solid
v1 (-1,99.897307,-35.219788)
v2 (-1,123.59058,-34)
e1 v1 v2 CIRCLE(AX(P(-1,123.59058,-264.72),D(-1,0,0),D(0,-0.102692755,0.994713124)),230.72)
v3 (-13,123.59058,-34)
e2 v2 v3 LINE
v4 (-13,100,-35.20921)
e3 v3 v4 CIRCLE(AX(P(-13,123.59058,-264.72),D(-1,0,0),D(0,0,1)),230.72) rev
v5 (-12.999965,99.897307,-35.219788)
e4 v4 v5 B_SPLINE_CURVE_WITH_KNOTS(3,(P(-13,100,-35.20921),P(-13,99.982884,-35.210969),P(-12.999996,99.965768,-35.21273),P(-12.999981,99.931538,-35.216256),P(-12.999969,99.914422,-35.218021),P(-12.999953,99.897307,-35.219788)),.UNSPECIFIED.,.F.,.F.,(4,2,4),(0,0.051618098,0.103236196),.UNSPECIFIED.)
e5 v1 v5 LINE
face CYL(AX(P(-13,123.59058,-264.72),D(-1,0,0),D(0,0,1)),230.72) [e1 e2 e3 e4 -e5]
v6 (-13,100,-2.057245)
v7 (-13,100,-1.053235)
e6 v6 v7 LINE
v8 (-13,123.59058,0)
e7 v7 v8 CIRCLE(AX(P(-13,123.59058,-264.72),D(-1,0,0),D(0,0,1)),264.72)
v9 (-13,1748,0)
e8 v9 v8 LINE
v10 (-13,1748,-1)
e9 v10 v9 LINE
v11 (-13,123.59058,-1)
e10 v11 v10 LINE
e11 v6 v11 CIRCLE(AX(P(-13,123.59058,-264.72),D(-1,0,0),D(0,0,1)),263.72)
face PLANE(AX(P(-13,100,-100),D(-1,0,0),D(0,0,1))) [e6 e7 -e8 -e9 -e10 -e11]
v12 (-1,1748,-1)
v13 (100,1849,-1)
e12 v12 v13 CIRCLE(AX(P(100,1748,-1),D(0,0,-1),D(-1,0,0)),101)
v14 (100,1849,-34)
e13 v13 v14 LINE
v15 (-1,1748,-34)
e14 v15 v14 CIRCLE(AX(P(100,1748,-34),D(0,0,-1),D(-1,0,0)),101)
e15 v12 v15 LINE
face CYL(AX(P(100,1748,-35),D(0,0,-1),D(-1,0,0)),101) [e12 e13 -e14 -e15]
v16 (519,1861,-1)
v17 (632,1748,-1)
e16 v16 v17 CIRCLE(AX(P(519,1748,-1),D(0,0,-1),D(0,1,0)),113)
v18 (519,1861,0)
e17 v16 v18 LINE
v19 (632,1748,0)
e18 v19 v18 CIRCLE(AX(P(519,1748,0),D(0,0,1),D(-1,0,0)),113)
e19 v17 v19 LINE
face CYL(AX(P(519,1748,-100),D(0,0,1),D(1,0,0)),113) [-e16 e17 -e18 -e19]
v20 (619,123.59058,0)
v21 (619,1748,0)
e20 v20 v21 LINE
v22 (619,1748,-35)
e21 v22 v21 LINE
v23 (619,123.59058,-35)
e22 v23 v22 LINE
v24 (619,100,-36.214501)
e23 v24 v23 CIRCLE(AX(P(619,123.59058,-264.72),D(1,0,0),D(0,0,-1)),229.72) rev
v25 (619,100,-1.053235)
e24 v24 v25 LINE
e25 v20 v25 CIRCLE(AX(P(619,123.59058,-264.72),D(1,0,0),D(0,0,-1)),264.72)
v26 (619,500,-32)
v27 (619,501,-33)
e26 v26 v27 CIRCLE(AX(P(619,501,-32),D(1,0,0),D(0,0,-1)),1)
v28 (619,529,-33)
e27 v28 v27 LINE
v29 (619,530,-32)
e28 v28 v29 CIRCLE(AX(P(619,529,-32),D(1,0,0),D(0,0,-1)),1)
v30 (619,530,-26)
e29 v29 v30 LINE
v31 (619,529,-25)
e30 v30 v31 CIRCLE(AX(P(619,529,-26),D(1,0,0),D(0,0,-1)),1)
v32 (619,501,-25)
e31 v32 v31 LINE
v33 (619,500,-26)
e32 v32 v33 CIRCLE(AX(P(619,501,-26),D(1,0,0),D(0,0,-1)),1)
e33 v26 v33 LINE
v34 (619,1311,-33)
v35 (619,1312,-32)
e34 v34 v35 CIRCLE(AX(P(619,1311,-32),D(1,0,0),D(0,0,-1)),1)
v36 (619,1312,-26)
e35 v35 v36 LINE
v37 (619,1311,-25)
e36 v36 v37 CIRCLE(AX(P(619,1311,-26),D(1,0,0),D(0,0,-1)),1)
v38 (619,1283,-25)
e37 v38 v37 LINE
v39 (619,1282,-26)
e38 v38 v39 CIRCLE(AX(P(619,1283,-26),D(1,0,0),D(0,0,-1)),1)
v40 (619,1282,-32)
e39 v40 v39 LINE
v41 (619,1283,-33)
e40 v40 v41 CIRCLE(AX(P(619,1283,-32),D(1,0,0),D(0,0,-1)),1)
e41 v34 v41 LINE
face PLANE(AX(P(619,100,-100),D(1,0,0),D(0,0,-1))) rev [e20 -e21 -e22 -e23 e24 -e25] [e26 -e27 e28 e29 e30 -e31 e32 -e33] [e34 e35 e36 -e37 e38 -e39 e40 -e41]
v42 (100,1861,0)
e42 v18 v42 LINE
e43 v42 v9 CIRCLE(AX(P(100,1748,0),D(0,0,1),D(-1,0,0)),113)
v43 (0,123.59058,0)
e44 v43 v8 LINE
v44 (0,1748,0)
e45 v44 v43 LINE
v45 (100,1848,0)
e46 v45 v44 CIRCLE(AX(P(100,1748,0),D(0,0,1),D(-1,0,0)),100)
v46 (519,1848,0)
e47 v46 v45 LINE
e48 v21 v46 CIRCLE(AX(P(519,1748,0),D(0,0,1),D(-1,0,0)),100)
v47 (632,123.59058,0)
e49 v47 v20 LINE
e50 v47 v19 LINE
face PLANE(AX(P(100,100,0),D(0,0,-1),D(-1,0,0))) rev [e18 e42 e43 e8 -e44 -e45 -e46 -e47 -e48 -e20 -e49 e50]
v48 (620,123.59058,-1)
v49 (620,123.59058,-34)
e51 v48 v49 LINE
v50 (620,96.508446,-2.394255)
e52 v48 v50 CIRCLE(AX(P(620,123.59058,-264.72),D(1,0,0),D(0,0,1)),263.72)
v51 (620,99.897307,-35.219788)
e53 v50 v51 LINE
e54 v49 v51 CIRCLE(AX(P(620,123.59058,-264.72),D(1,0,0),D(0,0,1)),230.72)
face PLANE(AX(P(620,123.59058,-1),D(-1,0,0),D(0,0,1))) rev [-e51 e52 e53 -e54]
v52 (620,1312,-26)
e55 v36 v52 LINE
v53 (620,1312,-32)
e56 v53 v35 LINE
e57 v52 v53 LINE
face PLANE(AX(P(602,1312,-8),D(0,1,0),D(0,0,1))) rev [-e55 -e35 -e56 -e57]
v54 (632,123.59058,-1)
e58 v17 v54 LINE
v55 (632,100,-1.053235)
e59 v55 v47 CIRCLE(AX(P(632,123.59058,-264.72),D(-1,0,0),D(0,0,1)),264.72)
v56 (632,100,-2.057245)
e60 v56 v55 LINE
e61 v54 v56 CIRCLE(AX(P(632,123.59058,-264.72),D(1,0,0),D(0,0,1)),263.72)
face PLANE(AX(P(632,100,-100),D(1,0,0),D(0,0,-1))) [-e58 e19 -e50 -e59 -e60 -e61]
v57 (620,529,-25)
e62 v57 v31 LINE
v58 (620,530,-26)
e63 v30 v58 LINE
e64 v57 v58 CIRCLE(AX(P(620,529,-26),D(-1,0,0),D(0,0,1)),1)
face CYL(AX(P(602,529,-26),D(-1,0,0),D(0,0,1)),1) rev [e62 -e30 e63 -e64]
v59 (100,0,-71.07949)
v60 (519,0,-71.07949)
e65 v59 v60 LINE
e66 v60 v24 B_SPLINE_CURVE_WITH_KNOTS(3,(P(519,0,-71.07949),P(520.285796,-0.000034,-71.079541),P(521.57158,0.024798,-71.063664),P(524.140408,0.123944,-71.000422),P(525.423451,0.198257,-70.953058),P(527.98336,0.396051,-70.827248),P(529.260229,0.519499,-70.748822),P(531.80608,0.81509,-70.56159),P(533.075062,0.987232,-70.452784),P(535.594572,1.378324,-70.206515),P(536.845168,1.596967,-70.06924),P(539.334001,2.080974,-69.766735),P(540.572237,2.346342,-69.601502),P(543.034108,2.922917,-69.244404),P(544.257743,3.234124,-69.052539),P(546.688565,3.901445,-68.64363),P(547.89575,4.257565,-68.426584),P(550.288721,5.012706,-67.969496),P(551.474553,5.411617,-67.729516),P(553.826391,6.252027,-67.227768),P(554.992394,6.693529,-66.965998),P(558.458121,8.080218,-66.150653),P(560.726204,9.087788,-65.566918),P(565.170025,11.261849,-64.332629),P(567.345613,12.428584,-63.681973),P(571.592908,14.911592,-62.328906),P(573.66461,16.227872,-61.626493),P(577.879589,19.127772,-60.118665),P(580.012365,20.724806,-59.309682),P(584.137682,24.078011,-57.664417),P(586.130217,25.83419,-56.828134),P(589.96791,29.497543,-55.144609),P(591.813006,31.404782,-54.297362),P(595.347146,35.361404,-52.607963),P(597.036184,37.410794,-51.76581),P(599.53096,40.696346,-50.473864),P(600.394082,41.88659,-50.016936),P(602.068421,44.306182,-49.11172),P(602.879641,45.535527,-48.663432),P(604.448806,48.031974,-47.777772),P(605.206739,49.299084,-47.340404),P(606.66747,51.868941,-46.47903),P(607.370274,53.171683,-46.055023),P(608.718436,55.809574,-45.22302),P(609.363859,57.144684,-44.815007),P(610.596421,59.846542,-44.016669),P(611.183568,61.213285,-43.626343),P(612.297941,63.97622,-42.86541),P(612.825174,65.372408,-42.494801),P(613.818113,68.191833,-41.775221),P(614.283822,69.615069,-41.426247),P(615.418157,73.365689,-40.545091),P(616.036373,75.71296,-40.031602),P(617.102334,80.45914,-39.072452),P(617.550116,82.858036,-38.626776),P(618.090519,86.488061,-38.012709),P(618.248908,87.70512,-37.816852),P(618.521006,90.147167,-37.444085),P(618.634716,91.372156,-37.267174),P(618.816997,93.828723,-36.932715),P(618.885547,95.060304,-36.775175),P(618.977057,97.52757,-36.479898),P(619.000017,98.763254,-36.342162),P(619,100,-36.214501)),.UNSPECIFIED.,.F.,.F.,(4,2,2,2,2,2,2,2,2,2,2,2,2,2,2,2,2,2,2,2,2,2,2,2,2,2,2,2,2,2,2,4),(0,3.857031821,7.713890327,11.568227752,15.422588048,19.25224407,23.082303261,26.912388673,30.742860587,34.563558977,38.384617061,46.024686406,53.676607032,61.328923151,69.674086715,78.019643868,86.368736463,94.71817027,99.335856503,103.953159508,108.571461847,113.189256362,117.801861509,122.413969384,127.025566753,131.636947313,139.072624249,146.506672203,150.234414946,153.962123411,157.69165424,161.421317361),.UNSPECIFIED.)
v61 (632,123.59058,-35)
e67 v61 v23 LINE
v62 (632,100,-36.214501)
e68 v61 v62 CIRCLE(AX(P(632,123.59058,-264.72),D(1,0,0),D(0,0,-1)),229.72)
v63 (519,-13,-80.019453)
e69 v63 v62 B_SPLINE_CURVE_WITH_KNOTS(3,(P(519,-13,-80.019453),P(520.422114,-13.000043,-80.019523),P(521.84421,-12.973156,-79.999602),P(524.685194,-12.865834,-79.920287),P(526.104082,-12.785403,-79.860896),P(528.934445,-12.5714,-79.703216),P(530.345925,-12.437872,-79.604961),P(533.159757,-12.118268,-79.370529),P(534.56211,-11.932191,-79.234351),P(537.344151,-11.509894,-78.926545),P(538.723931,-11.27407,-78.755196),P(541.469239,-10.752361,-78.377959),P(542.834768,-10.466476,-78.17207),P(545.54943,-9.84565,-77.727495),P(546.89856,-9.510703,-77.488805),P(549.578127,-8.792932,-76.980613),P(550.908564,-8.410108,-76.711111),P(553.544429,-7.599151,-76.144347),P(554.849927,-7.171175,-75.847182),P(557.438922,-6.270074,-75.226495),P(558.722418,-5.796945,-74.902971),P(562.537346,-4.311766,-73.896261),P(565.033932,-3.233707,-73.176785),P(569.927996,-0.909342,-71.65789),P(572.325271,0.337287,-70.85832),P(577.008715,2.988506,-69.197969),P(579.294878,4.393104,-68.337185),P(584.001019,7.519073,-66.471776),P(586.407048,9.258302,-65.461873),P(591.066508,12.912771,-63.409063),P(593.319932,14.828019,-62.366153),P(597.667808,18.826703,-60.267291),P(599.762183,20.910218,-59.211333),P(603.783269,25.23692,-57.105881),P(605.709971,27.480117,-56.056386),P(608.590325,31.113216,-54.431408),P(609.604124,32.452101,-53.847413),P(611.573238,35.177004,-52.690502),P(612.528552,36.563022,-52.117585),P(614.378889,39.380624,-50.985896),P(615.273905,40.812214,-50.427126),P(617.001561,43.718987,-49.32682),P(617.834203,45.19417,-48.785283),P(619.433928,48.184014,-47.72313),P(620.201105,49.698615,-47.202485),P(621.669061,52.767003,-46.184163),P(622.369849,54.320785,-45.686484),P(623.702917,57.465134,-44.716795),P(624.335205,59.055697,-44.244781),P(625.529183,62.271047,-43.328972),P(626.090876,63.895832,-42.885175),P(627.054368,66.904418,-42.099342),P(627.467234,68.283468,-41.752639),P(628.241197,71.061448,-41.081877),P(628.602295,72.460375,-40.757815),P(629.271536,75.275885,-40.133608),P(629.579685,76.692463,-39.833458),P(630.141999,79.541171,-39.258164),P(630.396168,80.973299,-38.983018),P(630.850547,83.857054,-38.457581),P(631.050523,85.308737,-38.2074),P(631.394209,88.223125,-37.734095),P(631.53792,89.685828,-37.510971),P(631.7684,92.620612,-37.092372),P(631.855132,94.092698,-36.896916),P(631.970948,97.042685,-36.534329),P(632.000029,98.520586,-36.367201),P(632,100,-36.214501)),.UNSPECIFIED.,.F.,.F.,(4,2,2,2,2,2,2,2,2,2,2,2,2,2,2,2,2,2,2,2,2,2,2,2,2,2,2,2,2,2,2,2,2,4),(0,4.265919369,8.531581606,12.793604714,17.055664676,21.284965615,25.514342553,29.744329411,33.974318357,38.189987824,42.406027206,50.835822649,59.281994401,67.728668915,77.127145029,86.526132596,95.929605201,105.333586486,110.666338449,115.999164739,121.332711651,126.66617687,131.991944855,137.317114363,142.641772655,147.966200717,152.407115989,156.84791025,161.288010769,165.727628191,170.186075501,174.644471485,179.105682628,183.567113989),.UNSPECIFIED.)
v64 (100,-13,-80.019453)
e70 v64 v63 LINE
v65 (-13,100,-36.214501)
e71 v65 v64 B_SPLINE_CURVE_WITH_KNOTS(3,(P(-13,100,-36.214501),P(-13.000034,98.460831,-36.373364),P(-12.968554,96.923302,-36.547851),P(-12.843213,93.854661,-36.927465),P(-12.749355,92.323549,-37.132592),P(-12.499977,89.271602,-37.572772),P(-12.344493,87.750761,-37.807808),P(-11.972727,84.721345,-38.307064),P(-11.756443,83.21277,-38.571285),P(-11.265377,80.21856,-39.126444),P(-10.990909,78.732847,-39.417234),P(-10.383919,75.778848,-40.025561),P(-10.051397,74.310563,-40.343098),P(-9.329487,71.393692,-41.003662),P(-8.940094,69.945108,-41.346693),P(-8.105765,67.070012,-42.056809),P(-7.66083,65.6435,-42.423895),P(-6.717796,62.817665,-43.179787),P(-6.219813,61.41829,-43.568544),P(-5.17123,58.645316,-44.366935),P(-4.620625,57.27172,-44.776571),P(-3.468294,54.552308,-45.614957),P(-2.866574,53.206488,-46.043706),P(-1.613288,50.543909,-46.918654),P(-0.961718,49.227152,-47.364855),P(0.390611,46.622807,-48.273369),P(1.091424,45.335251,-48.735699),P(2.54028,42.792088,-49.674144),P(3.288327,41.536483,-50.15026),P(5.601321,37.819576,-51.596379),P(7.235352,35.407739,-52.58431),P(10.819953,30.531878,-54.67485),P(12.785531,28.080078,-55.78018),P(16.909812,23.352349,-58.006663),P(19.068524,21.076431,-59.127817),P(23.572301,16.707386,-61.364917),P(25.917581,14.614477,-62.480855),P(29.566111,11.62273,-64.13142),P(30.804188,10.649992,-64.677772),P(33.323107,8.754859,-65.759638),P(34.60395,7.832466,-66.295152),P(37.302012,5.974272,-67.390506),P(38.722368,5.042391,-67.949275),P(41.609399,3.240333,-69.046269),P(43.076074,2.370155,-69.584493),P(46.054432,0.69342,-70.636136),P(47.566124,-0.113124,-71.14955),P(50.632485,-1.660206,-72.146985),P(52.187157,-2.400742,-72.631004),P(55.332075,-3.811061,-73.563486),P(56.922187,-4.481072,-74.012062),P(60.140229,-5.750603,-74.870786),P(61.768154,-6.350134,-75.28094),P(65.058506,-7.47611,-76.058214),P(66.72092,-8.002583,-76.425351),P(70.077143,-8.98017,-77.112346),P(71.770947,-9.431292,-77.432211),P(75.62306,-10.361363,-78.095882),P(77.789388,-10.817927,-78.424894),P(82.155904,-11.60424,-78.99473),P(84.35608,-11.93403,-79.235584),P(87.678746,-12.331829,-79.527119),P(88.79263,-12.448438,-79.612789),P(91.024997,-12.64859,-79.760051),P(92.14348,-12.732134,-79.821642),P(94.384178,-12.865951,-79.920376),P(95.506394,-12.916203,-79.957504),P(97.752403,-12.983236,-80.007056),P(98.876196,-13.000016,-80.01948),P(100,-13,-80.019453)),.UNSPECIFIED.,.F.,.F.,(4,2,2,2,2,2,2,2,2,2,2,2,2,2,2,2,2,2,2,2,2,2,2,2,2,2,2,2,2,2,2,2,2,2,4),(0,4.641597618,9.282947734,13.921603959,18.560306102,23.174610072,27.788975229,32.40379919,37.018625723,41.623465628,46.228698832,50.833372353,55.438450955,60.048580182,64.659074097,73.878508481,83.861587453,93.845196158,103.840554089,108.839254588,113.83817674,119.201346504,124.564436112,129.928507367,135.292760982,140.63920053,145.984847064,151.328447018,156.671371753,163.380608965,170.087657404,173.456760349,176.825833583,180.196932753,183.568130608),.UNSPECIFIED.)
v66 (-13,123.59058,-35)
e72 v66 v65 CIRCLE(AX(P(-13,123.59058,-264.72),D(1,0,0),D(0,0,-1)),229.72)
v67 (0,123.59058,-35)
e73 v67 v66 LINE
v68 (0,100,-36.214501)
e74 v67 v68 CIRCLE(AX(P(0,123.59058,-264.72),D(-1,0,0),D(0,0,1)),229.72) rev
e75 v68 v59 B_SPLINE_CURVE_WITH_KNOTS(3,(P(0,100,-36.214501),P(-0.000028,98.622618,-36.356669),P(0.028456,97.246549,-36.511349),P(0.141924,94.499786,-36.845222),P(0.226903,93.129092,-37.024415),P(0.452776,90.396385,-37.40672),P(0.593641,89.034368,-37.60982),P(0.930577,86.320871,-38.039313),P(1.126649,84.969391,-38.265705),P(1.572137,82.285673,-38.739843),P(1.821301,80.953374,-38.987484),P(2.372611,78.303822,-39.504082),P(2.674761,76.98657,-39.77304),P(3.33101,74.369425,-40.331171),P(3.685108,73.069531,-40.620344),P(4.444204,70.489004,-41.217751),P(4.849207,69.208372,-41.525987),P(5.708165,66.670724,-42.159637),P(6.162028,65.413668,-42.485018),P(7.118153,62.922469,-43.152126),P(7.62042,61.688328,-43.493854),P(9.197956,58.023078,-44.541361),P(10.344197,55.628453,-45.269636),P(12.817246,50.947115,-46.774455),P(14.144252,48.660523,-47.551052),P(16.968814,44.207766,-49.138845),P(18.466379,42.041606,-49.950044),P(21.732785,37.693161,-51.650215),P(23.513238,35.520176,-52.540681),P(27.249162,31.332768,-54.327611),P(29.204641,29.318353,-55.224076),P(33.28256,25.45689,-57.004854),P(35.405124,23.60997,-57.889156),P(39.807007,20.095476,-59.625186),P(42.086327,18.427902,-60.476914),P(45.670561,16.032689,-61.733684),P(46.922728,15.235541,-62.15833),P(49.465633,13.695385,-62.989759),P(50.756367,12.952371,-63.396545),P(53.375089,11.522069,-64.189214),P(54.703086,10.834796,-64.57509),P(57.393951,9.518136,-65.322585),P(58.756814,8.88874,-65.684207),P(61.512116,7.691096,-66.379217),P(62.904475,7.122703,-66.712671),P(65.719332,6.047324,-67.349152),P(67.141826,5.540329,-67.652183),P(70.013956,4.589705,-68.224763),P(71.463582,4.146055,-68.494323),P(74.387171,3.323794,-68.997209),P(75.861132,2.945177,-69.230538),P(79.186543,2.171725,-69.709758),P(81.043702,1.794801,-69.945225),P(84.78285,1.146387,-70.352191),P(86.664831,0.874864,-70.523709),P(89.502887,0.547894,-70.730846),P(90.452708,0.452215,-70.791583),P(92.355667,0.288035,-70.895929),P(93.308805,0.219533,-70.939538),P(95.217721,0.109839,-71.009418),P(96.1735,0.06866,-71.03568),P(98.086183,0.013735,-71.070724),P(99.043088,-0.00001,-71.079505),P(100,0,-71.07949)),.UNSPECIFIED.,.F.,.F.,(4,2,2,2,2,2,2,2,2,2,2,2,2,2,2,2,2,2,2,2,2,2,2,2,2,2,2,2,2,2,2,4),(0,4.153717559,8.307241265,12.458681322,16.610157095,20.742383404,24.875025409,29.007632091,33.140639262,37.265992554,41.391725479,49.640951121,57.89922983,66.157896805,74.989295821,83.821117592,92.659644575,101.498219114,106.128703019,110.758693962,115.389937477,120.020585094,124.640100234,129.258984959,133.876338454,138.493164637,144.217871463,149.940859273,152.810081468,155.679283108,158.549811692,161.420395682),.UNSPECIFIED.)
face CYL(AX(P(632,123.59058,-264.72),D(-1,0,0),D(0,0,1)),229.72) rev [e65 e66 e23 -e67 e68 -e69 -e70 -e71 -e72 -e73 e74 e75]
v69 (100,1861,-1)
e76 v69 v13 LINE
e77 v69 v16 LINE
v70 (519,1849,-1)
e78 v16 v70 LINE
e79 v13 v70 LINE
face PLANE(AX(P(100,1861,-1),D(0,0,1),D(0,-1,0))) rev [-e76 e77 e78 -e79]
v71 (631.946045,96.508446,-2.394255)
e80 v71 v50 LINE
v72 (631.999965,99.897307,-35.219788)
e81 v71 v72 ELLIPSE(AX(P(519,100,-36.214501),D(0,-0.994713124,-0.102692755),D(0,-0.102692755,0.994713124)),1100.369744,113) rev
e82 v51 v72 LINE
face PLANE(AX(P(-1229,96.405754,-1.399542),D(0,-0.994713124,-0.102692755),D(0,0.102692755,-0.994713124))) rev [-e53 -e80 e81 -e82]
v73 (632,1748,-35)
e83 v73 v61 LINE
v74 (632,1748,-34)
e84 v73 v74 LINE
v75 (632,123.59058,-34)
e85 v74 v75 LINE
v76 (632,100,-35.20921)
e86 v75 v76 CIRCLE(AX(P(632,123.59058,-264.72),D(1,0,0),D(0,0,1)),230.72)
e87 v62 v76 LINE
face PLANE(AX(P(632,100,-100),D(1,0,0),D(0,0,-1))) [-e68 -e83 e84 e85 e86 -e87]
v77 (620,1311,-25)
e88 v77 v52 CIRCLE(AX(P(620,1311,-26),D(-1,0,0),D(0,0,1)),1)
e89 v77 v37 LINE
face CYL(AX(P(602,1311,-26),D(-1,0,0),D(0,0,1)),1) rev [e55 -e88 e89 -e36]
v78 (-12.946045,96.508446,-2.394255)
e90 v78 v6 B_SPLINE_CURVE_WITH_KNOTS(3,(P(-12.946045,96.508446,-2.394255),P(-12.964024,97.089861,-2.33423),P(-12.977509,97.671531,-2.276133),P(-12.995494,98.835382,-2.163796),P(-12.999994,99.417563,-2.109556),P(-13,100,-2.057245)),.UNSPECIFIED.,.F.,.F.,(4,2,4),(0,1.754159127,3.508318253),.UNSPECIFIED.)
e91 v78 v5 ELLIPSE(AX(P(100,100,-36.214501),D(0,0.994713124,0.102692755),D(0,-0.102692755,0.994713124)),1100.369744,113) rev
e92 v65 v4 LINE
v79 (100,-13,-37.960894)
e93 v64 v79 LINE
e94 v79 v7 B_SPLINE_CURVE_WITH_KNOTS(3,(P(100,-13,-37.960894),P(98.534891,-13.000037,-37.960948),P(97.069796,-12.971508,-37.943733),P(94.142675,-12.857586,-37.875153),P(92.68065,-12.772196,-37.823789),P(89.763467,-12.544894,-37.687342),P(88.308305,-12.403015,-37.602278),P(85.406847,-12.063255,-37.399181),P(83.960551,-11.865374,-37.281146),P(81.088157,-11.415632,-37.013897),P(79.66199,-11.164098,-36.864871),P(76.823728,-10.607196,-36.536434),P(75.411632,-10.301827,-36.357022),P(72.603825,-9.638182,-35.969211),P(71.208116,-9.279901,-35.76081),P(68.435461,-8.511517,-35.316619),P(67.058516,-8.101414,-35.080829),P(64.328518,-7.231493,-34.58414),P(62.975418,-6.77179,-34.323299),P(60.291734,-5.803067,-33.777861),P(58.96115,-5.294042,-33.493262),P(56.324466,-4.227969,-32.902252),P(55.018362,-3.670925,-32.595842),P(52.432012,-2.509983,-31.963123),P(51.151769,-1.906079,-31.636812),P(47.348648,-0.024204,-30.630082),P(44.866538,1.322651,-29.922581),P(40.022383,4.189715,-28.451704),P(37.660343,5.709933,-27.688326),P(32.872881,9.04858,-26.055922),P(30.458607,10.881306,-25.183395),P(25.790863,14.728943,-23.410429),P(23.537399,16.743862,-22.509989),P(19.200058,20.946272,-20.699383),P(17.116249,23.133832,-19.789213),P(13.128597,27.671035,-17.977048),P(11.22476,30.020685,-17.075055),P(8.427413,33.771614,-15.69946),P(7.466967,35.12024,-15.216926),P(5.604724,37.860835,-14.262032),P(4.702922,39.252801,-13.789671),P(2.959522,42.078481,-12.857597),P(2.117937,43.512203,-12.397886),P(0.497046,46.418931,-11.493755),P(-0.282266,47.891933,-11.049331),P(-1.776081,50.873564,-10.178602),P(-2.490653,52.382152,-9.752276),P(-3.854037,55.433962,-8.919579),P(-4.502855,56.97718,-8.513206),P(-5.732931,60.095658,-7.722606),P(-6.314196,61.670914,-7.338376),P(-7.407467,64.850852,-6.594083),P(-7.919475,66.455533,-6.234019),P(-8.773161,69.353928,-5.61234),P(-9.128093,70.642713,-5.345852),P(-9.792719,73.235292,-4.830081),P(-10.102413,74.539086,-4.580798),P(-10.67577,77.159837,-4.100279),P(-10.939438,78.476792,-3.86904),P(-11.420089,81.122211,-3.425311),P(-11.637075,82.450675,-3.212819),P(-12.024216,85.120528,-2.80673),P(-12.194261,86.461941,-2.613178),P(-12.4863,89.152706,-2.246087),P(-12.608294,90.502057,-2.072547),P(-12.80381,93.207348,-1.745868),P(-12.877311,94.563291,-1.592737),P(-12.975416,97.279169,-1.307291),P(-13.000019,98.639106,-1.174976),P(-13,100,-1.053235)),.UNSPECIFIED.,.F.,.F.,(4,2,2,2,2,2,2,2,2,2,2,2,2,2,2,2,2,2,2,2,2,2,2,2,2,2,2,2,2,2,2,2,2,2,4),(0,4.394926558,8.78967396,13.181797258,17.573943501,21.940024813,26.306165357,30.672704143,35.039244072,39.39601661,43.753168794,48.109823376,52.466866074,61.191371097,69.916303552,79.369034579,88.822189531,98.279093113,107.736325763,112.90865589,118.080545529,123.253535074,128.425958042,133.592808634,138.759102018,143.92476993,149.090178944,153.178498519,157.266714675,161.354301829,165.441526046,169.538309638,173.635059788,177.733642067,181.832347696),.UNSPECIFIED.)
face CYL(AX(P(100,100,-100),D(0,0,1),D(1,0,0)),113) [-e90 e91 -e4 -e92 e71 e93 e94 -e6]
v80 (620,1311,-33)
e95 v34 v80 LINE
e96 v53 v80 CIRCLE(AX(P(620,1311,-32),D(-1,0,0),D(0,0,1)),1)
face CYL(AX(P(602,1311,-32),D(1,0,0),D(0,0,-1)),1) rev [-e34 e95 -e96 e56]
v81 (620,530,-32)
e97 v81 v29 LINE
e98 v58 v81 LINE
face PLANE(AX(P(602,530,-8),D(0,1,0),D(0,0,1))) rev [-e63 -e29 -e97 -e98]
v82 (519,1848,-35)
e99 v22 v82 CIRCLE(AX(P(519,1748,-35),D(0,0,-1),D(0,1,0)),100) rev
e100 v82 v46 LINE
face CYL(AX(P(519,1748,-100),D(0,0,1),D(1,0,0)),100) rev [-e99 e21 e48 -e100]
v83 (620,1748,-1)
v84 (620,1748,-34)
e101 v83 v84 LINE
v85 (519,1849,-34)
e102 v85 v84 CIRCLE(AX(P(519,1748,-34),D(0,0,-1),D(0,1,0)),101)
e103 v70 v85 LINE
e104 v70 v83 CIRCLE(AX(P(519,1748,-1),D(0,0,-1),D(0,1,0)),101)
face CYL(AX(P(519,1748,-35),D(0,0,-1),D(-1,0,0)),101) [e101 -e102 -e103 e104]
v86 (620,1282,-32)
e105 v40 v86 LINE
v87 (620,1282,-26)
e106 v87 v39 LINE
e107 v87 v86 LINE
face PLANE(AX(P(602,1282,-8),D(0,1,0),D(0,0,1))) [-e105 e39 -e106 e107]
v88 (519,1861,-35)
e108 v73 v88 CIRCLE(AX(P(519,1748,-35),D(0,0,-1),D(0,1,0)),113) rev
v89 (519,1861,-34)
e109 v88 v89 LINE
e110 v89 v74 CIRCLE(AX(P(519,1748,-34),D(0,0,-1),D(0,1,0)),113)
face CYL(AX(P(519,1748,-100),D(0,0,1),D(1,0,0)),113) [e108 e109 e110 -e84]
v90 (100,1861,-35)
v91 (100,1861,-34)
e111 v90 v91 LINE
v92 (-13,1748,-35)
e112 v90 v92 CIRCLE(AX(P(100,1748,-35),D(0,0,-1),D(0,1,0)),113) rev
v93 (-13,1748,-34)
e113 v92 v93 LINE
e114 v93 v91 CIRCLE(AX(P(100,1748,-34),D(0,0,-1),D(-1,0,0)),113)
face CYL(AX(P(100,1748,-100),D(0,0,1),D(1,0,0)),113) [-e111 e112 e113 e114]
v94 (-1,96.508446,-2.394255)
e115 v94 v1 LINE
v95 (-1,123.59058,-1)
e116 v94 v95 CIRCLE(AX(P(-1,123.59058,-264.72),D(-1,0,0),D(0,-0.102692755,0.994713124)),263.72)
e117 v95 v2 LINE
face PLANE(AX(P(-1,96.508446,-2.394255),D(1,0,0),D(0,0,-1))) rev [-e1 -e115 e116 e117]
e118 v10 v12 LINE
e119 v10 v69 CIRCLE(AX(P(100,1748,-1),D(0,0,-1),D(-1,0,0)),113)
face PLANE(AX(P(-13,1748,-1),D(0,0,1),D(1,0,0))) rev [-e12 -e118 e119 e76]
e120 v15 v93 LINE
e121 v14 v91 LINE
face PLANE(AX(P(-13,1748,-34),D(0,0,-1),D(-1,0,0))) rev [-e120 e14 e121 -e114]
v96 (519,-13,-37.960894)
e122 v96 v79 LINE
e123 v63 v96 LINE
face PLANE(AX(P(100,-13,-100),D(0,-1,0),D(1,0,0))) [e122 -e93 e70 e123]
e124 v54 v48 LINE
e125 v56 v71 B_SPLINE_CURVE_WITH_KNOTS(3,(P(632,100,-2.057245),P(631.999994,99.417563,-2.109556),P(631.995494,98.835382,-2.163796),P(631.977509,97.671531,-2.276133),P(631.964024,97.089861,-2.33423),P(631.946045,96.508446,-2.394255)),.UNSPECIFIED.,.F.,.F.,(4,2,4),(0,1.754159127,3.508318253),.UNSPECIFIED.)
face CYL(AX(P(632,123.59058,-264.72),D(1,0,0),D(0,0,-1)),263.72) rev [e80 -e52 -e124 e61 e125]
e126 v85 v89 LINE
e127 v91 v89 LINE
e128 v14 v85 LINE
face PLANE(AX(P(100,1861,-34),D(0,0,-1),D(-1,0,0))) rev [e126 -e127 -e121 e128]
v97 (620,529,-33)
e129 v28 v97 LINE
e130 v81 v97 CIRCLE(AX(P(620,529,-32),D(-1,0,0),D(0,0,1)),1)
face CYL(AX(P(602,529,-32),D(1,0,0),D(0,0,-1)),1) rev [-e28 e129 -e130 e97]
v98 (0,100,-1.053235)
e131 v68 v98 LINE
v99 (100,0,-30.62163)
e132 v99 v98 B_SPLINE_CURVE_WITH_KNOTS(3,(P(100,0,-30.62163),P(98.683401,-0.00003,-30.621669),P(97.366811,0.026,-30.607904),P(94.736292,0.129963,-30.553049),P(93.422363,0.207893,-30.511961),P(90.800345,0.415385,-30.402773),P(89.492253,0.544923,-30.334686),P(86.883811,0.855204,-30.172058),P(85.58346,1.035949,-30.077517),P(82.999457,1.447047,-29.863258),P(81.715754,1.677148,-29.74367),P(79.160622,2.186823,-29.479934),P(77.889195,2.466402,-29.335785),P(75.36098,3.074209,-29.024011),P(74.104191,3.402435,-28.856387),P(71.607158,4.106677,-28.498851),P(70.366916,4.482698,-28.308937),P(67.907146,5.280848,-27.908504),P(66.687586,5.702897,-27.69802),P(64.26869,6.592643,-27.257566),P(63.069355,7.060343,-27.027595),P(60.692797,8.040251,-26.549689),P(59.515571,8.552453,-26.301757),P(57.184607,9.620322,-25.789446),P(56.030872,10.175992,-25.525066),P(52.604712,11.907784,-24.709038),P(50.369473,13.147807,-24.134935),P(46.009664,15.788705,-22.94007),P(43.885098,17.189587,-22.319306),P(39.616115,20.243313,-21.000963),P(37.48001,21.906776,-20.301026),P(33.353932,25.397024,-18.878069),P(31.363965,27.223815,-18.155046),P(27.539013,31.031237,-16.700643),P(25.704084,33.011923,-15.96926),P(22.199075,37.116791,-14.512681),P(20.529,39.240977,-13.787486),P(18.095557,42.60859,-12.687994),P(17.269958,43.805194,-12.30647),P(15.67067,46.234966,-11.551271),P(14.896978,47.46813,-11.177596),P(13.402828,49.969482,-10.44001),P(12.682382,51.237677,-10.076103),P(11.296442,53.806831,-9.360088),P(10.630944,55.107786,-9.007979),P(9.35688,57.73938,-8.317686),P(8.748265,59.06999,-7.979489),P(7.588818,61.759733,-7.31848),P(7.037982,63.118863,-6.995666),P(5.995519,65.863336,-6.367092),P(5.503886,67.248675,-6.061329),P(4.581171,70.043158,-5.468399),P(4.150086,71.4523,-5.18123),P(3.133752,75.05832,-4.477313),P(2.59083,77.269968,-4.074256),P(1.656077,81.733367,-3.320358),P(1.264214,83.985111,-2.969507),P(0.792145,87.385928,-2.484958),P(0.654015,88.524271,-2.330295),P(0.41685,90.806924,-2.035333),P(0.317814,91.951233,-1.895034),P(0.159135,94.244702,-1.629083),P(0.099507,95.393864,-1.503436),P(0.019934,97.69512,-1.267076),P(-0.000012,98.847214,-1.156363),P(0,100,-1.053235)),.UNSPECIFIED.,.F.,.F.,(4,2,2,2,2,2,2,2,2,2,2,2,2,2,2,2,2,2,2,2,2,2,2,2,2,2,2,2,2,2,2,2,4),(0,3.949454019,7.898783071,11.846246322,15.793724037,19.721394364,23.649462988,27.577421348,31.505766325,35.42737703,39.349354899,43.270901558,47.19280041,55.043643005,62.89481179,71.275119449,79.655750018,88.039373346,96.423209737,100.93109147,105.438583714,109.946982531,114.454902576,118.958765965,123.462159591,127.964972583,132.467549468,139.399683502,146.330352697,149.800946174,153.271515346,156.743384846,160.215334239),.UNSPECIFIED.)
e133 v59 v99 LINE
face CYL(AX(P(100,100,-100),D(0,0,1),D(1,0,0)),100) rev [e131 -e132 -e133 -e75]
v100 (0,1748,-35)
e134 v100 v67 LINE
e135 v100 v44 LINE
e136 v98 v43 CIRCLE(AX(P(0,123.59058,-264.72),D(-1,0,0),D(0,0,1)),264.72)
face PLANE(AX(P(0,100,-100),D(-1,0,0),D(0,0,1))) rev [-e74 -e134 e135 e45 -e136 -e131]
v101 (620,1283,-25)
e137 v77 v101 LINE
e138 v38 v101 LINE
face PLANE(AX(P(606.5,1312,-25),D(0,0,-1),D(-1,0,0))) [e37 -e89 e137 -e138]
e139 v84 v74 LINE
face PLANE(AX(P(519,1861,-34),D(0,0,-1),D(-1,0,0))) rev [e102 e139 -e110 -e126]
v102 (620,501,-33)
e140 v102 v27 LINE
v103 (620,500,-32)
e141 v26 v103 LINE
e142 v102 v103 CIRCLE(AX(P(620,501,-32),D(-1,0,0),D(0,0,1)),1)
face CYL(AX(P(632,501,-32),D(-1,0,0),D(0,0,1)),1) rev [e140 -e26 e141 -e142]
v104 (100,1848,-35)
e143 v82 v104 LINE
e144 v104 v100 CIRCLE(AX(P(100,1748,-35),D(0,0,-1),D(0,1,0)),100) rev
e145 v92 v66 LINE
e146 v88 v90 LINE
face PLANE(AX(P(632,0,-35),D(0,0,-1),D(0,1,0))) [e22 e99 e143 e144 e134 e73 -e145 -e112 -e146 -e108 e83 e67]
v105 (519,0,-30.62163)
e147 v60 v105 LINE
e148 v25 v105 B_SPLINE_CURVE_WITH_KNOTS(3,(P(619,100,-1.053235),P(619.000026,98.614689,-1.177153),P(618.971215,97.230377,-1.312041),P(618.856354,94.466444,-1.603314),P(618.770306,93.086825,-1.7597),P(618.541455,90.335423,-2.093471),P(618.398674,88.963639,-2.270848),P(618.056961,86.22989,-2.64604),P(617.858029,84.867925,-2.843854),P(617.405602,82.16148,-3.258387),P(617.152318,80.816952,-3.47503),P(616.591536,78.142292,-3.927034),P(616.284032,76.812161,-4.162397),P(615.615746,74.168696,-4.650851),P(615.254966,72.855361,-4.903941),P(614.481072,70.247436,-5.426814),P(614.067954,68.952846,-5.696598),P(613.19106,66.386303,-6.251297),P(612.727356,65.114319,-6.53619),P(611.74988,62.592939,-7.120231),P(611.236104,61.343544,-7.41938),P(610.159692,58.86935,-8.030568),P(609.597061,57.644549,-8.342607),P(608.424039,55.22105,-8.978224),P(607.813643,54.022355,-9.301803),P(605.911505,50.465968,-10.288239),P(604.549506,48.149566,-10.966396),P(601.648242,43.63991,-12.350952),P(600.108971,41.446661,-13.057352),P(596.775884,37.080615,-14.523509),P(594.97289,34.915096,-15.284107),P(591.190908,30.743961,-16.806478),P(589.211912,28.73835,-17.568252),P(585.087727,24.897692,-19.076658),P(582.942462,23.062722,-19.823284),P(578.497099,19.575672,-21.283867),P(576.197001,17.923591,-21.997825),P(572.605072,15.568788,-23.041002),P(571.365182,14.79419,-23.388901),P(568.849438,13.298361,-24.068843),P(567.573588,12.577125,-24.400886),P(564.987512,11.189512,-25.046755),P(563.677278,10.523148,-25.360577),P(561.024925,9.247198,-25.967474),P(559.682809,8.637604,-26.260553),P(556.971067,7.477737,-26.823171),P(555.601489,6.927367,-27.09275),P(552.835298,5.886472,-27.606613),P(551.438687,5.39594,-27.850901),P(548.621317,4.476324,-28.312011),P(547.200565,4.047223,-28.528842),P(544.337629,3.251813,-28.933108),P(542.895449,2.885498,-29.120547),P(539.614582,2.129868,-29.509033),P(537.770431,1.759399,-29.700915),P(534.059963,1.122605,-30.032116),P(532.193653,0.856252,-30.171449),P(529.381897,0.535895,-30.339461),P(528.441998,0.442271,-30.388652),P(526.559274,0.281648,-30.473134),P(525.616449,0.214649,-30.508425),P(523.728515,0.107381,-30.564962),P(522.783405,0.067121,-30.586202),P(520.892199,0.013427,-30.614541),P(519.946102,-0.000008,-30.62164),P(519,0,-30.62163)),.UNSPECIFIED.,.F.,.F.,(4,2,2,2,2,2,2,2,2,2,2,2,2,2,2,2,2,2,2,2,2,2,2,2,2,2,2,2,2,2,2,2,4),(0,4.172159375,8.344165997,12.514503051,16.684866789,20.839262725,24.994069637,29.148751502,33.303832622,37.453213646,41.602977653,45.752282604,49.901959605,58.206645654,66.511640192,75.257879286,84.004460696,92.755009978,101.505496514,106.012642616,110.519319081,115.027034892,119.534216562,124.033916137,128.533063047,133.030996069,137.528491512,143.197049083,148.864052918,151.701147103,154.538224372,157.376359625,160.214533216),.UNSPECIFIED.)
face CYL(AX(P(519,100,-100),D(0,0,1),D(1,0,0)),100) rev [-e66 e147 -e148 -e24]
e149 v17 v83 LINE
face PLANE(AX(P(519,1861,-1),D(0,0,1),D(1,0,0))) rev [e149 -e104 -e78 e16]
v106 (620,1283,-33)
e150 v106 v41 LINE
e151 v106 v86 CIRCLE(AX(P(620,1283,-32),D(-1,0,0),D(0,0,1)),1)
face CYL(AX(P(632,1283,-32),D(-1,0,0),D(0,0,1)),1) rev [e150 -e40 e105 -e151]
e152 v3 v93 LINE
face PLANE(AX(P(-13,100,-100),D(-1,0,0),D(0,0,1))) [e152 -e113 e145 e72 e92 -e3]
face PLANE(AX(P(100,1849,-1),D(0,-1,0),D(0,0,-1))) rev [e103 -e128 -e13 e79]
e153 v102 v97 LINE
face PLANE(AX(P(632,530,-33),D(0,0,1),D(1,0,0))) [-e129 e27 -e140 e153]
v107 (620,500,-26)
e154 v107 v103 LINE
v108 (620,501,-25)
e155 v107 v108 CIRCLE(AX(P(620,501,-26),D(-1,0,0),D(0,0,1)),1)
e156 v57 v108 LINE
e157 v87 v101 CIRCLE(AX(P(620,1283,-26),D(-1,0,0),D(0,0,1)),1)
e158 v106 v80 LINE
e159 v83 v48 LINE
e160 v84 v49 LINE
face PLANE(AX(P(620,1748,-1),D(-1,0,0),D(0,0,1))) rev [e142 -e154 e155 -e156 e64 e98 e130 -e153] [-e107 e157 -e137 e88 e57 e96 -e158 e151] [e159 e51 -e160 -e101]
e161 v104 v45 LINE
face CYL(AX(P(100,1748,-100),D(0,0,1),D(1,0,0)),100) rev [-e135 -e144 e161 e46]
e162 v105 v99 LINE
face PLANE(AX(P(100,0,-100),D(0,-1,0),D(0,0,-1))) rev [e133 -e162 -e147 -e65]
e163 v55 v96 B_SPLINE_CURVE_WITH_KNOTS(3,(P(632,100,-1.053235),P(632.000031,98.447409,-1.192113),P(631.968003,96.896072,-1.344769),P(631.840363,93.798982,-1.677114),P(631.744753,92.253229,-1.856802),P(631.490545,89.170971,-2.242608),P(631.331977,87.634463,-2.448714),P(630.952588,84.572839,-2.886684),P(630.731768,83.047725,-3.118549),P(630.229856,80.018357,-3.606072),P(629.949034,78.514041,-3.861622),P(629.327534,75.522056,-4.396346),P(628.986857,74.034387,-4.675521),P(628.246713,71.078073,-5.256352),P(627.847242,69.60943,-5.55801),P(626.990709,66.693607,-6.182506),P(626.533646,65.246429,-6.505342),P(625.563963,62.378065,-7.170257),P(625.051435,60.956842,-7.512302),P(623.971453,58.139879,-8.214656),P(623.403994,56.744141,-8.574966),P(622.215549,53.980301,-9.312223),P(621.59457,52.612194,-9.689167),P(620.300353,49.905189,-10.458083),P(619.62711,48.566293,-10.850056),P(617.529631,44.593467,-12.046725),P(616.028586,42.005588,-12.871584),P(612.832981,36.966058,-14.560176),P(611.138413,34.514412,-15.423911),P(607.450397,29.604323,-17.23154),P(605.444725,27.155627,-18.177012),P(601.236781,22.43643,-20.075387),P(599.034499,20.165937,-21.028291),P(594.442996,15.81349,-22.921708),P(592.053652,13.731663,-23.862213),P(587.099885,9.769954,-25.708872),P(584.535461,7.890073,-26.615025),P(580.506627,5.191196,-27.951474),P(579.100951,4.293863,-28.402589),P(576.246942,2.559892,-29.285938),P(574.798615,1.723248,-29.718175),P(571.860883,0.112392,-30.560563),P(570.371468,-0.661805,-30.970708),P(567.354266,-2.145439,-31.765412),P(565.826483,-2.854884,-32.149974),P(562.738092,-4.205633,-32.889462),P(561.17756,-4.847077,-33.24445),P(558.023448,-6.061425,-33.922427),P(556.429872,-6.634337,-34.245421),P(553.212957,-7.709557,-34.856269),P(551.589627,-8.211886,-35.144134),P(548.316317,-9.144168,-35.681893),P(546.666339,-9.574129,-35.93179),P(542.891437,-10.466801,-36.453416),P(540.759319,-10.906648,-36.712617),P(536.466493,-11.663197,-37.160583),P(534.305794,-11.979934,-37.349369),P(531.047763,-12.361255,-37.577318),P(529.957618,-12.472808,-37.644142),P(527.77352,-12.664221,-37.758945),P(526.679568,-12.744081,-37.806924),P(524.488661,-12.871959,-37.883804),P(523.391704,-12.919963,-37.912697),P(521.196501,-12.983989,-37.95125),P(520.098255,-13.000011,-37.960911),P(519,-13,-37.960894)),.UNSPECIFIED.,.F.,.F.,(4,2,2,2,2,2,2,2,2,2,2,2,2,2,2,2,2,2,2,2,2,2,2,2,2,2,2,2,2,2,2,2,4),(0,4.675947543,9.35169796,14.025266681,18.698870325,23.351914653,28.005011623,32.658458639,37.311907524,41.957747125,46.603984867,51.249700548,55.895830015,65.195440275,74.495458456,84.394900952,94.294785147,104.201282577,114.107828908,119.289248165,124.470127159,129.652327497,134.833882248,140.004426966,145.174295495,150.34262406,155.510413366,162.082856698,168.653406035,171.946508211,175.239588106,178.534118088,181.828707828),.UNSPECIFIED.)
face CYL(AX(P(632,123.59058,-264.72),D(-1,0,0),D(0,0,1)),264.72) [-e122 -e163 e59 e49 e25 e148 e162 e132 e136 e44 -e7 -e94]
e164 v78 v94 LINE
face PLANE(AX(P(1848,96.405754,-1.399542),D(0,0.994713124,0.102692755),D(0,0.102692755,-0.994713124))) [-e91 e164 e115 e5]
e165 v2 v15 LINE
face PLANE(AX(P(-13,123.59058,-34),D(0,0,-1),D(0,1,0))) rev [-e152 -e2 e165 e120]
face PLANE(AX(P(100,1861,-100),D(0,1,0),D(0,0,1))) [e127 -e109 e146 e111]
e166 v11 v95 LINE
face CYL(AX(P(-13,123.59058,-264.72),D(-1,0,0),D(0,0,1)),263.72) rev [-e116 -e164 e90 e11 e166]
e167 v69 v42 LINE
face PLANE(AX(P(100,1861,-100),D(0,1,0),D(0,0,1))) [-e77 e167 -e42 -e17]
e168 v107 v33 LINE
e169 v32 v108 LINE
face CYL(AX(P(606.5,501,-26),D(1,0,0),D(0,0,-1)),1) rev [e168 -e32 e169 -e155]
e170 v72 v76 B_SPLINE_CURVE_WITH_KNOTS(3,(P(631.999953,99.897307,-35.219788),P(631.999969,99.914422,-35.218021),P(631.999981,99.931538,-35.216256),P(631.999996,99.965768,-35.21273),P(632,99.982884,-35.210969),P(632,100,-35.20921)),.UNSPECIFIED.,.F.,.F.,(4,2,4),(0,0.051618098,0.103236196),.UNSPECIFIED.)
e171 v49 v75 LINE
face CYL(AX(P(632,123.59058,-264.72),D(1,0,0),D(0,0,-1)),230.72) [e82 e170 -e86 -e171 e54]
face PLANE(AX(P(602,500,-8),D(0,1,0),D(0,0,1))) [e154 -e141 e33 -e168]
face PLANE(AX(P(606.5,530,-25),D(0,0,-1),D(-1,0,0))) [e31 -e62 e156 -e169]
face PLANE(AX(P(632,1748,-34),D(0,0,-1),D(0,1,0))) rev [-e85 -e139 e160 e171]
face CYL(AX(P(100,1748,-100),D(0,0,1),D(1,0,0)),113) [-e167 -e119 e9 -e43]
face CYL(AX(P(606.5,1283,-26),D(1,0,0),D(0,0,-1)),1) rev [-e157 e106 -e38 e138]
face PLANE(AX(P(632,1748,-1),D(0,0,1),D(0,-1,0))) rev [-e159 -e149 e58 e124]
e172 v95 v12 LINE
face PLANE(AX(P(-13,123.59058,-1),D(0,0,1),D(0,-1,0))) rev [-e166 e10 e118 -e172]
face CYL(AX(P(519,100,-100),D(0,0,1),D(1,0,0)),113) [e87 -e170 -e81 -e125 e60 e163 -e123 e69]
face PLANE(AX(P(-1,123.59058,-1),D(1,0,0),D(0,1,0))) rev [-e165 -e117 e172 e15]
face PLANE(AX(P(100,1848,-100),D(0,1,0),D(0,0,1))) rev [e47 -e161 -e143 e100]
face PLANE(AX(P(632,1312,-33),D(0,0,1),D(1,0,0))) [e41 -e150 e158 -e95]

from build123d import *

# Parameters (mm, degrees)
BOSS_EXTRUDE1_DEPTH     = 100
CUT_EXTRUDE1_DEPTH      = 1968.929114577
CUT_EXTRUDE1_DEPTH_BACK = 1968.929114577
SKETCH3_W               = 33
SKETCH3_H               = 12
CAVITY1_START           = 619
CAVITY1_DEPTH           = 1


# Read off the part's stored shape, not the designer's step: Cavity1
with BuildPart() as part:
    # Sketch1 → Boss-Extrude1 (new body)
    with BuildSketch(Plane.XY):
        with BuildLine():
            Line((-13, 100), (-13, 1748))
            ThreePointArc((-13, 1748), (20.096933726, 1827.903066274), (100, 1861))
            Line((100, 1861), (519, 1861))
            ThreePointArc((519, 1861), (598.903066274, 1827.903066274), (632, 1748))
            Line((632, 1748), (632, 100))
            ThreePointArc((632, 100), (598.903066274, 20.096933726), (519, -13))
            Line((519, -13), (100, -13))
            ThreePointArc((100, -13), (20.096933726, 20.096933726), (-13, 100))
        make_face()
        with BuildLine():
            Line((100, 0), (519, 0))
            ThreePointArc((519, 0), (589.710678119, 29.289321881), (619, 100))
            Line((619, 100), (619, 1748))
            ThreePointArc((619, 1748), (589.710678119, 1818.710678119), (519, 1848))
            Line((519, 1848), (100, 1848))
            ThreePointArc((100, 1848), (29.289321881, 1818.710678119), (0, 1748))
            Line((0, 1748), (0, 100))
            ThreePointArc((0, 100), (29.289321881, 29.289321881), (100, 0))
        make_face(mode=Mode.SUBTRACT)
    extrude(amount=-BOSS_EXTRUDE1_DEPTH)

    # Sketch2 → Cut-Extrude1 (cut, two sides: drawn at the far end of the back side and taken through both)
    with BuildSketch(Plane(origin=(0, 0, 0), x_dir=(0, 0, -1), z_dir=(1, 0, 0)).offset(-CUT_EXTRUDE1_DEPTH_BACK)):
        with BuildLine():
            Line((100, 1861), (35, 1861))
            Line((35, 1861), (35, 123.590579564))
            ThreePointArc((35, 123.590579564), (51.869398873, 37.185139921), (100, -36.53))
            Line((100, -36.53), (100, 1861))
        make_face()
        with BuildLine():
            Line((0, -36.53), (53.916588263, -36.53))
            ThreePointArc((53.916588263, -36.53), (13.84098777, 39.113365936), (0, 123.590579564))
            Line((0, 123.590579564), (0, -36.53))
        make_face()
    extrude(amount=CUT_EXTRUDE1_DEPTH + CUT_EXTRUDE1_DEPTH_BACK, mode=Mode.SUBTRACT)

    # Cut-Sweep1: sweep along a curve in space
    with BuildLine() as cut_sweep1_path:
        ThreePointArc((-13, 123.590579564, -35), (-13, 111.779668745, -35.303826234), (-13, 100, -36.214501257))
        Line((-13, 1748, -35), (-13, 123.590579564, -35))
        ThreePointArc((100, 1861, -35), (20.096933726, 1827.903066274, -35), (-13, 1748, -35))
        Line((519, 1861, -35), (100, 1861, -35))
        ThreePointArc((632, 1748, -35), (598.903066274, 1827.903066274, -35), (519, 1861, -35))
        Line((632, 1748, -35), (632, 123.590579564, -35))
        ThreePointArc((632, 123.590579564, -35), (632, 111.779668745, -35.303826234), (632, 100, -36.214501257))
    # Sketch3 → Cut-Sweep1 (sweep, cut)
    with BuildSketch(Plane(origin=(309.5, 0, 0), x_dir=(0, 0, -1), z_dir=(1, 0, 0))):
        with Locations((17.5, 1855)):
            Rectangle(SKETCH3_W, SKETCH3_H)
    sweep(path=cut_sweep1_path.line, mode=Mode.SUBTRACT)

    # Cavity1 outline → Cavity1 (cut)
    with BuildSketch(Plane.YZ.offset(CAVITY1_START)):
        with BuildLine():
            ThreePointArc((1311, -33), (1311.707106781, -32.707106781), (1312, -32))
            Line((1312, -32), (1312, -26))
            ThreePointArc((1312, -26), (1311.707106781, -25.292893219), (1311, -25))
            Line((1311, -25), (1283, -25))
            ThreePointArc((1283, -25), (1282.292893219, -25.292893219), (1282, -26))
            Line((1282, -26), (1282, -32))
            ThreePointArc((1282, -32), (1282.292893219, -32.707106781), (1283, -33))
            Line((1283, -33), (1311, -33))
        make_face()
        with BuildLine():
            Line((501, -33), (529, -33))
            ThreePointArc((529, -33), (529.707106781, -32.707106781), (530, -32))
            Line((530, -32), (530, -26))
            ThreePointArc((530, -26), (529.707106781, -25.292893219), (529, -25))
            Line((529, -25), (501, -25))
            ThreePointArc((501, -25), (500.292893219, -25.292893219), (500, -26))
            Line((500, -26), (500, -32))
            ThreePointArc((500, -32), (500.292893219, -32.707106781), (501, -33))
        make_face()
    extrude(amount=CAVITY1_DEPTH, mode=Mode.SUBTRACT)


solid = part.part
